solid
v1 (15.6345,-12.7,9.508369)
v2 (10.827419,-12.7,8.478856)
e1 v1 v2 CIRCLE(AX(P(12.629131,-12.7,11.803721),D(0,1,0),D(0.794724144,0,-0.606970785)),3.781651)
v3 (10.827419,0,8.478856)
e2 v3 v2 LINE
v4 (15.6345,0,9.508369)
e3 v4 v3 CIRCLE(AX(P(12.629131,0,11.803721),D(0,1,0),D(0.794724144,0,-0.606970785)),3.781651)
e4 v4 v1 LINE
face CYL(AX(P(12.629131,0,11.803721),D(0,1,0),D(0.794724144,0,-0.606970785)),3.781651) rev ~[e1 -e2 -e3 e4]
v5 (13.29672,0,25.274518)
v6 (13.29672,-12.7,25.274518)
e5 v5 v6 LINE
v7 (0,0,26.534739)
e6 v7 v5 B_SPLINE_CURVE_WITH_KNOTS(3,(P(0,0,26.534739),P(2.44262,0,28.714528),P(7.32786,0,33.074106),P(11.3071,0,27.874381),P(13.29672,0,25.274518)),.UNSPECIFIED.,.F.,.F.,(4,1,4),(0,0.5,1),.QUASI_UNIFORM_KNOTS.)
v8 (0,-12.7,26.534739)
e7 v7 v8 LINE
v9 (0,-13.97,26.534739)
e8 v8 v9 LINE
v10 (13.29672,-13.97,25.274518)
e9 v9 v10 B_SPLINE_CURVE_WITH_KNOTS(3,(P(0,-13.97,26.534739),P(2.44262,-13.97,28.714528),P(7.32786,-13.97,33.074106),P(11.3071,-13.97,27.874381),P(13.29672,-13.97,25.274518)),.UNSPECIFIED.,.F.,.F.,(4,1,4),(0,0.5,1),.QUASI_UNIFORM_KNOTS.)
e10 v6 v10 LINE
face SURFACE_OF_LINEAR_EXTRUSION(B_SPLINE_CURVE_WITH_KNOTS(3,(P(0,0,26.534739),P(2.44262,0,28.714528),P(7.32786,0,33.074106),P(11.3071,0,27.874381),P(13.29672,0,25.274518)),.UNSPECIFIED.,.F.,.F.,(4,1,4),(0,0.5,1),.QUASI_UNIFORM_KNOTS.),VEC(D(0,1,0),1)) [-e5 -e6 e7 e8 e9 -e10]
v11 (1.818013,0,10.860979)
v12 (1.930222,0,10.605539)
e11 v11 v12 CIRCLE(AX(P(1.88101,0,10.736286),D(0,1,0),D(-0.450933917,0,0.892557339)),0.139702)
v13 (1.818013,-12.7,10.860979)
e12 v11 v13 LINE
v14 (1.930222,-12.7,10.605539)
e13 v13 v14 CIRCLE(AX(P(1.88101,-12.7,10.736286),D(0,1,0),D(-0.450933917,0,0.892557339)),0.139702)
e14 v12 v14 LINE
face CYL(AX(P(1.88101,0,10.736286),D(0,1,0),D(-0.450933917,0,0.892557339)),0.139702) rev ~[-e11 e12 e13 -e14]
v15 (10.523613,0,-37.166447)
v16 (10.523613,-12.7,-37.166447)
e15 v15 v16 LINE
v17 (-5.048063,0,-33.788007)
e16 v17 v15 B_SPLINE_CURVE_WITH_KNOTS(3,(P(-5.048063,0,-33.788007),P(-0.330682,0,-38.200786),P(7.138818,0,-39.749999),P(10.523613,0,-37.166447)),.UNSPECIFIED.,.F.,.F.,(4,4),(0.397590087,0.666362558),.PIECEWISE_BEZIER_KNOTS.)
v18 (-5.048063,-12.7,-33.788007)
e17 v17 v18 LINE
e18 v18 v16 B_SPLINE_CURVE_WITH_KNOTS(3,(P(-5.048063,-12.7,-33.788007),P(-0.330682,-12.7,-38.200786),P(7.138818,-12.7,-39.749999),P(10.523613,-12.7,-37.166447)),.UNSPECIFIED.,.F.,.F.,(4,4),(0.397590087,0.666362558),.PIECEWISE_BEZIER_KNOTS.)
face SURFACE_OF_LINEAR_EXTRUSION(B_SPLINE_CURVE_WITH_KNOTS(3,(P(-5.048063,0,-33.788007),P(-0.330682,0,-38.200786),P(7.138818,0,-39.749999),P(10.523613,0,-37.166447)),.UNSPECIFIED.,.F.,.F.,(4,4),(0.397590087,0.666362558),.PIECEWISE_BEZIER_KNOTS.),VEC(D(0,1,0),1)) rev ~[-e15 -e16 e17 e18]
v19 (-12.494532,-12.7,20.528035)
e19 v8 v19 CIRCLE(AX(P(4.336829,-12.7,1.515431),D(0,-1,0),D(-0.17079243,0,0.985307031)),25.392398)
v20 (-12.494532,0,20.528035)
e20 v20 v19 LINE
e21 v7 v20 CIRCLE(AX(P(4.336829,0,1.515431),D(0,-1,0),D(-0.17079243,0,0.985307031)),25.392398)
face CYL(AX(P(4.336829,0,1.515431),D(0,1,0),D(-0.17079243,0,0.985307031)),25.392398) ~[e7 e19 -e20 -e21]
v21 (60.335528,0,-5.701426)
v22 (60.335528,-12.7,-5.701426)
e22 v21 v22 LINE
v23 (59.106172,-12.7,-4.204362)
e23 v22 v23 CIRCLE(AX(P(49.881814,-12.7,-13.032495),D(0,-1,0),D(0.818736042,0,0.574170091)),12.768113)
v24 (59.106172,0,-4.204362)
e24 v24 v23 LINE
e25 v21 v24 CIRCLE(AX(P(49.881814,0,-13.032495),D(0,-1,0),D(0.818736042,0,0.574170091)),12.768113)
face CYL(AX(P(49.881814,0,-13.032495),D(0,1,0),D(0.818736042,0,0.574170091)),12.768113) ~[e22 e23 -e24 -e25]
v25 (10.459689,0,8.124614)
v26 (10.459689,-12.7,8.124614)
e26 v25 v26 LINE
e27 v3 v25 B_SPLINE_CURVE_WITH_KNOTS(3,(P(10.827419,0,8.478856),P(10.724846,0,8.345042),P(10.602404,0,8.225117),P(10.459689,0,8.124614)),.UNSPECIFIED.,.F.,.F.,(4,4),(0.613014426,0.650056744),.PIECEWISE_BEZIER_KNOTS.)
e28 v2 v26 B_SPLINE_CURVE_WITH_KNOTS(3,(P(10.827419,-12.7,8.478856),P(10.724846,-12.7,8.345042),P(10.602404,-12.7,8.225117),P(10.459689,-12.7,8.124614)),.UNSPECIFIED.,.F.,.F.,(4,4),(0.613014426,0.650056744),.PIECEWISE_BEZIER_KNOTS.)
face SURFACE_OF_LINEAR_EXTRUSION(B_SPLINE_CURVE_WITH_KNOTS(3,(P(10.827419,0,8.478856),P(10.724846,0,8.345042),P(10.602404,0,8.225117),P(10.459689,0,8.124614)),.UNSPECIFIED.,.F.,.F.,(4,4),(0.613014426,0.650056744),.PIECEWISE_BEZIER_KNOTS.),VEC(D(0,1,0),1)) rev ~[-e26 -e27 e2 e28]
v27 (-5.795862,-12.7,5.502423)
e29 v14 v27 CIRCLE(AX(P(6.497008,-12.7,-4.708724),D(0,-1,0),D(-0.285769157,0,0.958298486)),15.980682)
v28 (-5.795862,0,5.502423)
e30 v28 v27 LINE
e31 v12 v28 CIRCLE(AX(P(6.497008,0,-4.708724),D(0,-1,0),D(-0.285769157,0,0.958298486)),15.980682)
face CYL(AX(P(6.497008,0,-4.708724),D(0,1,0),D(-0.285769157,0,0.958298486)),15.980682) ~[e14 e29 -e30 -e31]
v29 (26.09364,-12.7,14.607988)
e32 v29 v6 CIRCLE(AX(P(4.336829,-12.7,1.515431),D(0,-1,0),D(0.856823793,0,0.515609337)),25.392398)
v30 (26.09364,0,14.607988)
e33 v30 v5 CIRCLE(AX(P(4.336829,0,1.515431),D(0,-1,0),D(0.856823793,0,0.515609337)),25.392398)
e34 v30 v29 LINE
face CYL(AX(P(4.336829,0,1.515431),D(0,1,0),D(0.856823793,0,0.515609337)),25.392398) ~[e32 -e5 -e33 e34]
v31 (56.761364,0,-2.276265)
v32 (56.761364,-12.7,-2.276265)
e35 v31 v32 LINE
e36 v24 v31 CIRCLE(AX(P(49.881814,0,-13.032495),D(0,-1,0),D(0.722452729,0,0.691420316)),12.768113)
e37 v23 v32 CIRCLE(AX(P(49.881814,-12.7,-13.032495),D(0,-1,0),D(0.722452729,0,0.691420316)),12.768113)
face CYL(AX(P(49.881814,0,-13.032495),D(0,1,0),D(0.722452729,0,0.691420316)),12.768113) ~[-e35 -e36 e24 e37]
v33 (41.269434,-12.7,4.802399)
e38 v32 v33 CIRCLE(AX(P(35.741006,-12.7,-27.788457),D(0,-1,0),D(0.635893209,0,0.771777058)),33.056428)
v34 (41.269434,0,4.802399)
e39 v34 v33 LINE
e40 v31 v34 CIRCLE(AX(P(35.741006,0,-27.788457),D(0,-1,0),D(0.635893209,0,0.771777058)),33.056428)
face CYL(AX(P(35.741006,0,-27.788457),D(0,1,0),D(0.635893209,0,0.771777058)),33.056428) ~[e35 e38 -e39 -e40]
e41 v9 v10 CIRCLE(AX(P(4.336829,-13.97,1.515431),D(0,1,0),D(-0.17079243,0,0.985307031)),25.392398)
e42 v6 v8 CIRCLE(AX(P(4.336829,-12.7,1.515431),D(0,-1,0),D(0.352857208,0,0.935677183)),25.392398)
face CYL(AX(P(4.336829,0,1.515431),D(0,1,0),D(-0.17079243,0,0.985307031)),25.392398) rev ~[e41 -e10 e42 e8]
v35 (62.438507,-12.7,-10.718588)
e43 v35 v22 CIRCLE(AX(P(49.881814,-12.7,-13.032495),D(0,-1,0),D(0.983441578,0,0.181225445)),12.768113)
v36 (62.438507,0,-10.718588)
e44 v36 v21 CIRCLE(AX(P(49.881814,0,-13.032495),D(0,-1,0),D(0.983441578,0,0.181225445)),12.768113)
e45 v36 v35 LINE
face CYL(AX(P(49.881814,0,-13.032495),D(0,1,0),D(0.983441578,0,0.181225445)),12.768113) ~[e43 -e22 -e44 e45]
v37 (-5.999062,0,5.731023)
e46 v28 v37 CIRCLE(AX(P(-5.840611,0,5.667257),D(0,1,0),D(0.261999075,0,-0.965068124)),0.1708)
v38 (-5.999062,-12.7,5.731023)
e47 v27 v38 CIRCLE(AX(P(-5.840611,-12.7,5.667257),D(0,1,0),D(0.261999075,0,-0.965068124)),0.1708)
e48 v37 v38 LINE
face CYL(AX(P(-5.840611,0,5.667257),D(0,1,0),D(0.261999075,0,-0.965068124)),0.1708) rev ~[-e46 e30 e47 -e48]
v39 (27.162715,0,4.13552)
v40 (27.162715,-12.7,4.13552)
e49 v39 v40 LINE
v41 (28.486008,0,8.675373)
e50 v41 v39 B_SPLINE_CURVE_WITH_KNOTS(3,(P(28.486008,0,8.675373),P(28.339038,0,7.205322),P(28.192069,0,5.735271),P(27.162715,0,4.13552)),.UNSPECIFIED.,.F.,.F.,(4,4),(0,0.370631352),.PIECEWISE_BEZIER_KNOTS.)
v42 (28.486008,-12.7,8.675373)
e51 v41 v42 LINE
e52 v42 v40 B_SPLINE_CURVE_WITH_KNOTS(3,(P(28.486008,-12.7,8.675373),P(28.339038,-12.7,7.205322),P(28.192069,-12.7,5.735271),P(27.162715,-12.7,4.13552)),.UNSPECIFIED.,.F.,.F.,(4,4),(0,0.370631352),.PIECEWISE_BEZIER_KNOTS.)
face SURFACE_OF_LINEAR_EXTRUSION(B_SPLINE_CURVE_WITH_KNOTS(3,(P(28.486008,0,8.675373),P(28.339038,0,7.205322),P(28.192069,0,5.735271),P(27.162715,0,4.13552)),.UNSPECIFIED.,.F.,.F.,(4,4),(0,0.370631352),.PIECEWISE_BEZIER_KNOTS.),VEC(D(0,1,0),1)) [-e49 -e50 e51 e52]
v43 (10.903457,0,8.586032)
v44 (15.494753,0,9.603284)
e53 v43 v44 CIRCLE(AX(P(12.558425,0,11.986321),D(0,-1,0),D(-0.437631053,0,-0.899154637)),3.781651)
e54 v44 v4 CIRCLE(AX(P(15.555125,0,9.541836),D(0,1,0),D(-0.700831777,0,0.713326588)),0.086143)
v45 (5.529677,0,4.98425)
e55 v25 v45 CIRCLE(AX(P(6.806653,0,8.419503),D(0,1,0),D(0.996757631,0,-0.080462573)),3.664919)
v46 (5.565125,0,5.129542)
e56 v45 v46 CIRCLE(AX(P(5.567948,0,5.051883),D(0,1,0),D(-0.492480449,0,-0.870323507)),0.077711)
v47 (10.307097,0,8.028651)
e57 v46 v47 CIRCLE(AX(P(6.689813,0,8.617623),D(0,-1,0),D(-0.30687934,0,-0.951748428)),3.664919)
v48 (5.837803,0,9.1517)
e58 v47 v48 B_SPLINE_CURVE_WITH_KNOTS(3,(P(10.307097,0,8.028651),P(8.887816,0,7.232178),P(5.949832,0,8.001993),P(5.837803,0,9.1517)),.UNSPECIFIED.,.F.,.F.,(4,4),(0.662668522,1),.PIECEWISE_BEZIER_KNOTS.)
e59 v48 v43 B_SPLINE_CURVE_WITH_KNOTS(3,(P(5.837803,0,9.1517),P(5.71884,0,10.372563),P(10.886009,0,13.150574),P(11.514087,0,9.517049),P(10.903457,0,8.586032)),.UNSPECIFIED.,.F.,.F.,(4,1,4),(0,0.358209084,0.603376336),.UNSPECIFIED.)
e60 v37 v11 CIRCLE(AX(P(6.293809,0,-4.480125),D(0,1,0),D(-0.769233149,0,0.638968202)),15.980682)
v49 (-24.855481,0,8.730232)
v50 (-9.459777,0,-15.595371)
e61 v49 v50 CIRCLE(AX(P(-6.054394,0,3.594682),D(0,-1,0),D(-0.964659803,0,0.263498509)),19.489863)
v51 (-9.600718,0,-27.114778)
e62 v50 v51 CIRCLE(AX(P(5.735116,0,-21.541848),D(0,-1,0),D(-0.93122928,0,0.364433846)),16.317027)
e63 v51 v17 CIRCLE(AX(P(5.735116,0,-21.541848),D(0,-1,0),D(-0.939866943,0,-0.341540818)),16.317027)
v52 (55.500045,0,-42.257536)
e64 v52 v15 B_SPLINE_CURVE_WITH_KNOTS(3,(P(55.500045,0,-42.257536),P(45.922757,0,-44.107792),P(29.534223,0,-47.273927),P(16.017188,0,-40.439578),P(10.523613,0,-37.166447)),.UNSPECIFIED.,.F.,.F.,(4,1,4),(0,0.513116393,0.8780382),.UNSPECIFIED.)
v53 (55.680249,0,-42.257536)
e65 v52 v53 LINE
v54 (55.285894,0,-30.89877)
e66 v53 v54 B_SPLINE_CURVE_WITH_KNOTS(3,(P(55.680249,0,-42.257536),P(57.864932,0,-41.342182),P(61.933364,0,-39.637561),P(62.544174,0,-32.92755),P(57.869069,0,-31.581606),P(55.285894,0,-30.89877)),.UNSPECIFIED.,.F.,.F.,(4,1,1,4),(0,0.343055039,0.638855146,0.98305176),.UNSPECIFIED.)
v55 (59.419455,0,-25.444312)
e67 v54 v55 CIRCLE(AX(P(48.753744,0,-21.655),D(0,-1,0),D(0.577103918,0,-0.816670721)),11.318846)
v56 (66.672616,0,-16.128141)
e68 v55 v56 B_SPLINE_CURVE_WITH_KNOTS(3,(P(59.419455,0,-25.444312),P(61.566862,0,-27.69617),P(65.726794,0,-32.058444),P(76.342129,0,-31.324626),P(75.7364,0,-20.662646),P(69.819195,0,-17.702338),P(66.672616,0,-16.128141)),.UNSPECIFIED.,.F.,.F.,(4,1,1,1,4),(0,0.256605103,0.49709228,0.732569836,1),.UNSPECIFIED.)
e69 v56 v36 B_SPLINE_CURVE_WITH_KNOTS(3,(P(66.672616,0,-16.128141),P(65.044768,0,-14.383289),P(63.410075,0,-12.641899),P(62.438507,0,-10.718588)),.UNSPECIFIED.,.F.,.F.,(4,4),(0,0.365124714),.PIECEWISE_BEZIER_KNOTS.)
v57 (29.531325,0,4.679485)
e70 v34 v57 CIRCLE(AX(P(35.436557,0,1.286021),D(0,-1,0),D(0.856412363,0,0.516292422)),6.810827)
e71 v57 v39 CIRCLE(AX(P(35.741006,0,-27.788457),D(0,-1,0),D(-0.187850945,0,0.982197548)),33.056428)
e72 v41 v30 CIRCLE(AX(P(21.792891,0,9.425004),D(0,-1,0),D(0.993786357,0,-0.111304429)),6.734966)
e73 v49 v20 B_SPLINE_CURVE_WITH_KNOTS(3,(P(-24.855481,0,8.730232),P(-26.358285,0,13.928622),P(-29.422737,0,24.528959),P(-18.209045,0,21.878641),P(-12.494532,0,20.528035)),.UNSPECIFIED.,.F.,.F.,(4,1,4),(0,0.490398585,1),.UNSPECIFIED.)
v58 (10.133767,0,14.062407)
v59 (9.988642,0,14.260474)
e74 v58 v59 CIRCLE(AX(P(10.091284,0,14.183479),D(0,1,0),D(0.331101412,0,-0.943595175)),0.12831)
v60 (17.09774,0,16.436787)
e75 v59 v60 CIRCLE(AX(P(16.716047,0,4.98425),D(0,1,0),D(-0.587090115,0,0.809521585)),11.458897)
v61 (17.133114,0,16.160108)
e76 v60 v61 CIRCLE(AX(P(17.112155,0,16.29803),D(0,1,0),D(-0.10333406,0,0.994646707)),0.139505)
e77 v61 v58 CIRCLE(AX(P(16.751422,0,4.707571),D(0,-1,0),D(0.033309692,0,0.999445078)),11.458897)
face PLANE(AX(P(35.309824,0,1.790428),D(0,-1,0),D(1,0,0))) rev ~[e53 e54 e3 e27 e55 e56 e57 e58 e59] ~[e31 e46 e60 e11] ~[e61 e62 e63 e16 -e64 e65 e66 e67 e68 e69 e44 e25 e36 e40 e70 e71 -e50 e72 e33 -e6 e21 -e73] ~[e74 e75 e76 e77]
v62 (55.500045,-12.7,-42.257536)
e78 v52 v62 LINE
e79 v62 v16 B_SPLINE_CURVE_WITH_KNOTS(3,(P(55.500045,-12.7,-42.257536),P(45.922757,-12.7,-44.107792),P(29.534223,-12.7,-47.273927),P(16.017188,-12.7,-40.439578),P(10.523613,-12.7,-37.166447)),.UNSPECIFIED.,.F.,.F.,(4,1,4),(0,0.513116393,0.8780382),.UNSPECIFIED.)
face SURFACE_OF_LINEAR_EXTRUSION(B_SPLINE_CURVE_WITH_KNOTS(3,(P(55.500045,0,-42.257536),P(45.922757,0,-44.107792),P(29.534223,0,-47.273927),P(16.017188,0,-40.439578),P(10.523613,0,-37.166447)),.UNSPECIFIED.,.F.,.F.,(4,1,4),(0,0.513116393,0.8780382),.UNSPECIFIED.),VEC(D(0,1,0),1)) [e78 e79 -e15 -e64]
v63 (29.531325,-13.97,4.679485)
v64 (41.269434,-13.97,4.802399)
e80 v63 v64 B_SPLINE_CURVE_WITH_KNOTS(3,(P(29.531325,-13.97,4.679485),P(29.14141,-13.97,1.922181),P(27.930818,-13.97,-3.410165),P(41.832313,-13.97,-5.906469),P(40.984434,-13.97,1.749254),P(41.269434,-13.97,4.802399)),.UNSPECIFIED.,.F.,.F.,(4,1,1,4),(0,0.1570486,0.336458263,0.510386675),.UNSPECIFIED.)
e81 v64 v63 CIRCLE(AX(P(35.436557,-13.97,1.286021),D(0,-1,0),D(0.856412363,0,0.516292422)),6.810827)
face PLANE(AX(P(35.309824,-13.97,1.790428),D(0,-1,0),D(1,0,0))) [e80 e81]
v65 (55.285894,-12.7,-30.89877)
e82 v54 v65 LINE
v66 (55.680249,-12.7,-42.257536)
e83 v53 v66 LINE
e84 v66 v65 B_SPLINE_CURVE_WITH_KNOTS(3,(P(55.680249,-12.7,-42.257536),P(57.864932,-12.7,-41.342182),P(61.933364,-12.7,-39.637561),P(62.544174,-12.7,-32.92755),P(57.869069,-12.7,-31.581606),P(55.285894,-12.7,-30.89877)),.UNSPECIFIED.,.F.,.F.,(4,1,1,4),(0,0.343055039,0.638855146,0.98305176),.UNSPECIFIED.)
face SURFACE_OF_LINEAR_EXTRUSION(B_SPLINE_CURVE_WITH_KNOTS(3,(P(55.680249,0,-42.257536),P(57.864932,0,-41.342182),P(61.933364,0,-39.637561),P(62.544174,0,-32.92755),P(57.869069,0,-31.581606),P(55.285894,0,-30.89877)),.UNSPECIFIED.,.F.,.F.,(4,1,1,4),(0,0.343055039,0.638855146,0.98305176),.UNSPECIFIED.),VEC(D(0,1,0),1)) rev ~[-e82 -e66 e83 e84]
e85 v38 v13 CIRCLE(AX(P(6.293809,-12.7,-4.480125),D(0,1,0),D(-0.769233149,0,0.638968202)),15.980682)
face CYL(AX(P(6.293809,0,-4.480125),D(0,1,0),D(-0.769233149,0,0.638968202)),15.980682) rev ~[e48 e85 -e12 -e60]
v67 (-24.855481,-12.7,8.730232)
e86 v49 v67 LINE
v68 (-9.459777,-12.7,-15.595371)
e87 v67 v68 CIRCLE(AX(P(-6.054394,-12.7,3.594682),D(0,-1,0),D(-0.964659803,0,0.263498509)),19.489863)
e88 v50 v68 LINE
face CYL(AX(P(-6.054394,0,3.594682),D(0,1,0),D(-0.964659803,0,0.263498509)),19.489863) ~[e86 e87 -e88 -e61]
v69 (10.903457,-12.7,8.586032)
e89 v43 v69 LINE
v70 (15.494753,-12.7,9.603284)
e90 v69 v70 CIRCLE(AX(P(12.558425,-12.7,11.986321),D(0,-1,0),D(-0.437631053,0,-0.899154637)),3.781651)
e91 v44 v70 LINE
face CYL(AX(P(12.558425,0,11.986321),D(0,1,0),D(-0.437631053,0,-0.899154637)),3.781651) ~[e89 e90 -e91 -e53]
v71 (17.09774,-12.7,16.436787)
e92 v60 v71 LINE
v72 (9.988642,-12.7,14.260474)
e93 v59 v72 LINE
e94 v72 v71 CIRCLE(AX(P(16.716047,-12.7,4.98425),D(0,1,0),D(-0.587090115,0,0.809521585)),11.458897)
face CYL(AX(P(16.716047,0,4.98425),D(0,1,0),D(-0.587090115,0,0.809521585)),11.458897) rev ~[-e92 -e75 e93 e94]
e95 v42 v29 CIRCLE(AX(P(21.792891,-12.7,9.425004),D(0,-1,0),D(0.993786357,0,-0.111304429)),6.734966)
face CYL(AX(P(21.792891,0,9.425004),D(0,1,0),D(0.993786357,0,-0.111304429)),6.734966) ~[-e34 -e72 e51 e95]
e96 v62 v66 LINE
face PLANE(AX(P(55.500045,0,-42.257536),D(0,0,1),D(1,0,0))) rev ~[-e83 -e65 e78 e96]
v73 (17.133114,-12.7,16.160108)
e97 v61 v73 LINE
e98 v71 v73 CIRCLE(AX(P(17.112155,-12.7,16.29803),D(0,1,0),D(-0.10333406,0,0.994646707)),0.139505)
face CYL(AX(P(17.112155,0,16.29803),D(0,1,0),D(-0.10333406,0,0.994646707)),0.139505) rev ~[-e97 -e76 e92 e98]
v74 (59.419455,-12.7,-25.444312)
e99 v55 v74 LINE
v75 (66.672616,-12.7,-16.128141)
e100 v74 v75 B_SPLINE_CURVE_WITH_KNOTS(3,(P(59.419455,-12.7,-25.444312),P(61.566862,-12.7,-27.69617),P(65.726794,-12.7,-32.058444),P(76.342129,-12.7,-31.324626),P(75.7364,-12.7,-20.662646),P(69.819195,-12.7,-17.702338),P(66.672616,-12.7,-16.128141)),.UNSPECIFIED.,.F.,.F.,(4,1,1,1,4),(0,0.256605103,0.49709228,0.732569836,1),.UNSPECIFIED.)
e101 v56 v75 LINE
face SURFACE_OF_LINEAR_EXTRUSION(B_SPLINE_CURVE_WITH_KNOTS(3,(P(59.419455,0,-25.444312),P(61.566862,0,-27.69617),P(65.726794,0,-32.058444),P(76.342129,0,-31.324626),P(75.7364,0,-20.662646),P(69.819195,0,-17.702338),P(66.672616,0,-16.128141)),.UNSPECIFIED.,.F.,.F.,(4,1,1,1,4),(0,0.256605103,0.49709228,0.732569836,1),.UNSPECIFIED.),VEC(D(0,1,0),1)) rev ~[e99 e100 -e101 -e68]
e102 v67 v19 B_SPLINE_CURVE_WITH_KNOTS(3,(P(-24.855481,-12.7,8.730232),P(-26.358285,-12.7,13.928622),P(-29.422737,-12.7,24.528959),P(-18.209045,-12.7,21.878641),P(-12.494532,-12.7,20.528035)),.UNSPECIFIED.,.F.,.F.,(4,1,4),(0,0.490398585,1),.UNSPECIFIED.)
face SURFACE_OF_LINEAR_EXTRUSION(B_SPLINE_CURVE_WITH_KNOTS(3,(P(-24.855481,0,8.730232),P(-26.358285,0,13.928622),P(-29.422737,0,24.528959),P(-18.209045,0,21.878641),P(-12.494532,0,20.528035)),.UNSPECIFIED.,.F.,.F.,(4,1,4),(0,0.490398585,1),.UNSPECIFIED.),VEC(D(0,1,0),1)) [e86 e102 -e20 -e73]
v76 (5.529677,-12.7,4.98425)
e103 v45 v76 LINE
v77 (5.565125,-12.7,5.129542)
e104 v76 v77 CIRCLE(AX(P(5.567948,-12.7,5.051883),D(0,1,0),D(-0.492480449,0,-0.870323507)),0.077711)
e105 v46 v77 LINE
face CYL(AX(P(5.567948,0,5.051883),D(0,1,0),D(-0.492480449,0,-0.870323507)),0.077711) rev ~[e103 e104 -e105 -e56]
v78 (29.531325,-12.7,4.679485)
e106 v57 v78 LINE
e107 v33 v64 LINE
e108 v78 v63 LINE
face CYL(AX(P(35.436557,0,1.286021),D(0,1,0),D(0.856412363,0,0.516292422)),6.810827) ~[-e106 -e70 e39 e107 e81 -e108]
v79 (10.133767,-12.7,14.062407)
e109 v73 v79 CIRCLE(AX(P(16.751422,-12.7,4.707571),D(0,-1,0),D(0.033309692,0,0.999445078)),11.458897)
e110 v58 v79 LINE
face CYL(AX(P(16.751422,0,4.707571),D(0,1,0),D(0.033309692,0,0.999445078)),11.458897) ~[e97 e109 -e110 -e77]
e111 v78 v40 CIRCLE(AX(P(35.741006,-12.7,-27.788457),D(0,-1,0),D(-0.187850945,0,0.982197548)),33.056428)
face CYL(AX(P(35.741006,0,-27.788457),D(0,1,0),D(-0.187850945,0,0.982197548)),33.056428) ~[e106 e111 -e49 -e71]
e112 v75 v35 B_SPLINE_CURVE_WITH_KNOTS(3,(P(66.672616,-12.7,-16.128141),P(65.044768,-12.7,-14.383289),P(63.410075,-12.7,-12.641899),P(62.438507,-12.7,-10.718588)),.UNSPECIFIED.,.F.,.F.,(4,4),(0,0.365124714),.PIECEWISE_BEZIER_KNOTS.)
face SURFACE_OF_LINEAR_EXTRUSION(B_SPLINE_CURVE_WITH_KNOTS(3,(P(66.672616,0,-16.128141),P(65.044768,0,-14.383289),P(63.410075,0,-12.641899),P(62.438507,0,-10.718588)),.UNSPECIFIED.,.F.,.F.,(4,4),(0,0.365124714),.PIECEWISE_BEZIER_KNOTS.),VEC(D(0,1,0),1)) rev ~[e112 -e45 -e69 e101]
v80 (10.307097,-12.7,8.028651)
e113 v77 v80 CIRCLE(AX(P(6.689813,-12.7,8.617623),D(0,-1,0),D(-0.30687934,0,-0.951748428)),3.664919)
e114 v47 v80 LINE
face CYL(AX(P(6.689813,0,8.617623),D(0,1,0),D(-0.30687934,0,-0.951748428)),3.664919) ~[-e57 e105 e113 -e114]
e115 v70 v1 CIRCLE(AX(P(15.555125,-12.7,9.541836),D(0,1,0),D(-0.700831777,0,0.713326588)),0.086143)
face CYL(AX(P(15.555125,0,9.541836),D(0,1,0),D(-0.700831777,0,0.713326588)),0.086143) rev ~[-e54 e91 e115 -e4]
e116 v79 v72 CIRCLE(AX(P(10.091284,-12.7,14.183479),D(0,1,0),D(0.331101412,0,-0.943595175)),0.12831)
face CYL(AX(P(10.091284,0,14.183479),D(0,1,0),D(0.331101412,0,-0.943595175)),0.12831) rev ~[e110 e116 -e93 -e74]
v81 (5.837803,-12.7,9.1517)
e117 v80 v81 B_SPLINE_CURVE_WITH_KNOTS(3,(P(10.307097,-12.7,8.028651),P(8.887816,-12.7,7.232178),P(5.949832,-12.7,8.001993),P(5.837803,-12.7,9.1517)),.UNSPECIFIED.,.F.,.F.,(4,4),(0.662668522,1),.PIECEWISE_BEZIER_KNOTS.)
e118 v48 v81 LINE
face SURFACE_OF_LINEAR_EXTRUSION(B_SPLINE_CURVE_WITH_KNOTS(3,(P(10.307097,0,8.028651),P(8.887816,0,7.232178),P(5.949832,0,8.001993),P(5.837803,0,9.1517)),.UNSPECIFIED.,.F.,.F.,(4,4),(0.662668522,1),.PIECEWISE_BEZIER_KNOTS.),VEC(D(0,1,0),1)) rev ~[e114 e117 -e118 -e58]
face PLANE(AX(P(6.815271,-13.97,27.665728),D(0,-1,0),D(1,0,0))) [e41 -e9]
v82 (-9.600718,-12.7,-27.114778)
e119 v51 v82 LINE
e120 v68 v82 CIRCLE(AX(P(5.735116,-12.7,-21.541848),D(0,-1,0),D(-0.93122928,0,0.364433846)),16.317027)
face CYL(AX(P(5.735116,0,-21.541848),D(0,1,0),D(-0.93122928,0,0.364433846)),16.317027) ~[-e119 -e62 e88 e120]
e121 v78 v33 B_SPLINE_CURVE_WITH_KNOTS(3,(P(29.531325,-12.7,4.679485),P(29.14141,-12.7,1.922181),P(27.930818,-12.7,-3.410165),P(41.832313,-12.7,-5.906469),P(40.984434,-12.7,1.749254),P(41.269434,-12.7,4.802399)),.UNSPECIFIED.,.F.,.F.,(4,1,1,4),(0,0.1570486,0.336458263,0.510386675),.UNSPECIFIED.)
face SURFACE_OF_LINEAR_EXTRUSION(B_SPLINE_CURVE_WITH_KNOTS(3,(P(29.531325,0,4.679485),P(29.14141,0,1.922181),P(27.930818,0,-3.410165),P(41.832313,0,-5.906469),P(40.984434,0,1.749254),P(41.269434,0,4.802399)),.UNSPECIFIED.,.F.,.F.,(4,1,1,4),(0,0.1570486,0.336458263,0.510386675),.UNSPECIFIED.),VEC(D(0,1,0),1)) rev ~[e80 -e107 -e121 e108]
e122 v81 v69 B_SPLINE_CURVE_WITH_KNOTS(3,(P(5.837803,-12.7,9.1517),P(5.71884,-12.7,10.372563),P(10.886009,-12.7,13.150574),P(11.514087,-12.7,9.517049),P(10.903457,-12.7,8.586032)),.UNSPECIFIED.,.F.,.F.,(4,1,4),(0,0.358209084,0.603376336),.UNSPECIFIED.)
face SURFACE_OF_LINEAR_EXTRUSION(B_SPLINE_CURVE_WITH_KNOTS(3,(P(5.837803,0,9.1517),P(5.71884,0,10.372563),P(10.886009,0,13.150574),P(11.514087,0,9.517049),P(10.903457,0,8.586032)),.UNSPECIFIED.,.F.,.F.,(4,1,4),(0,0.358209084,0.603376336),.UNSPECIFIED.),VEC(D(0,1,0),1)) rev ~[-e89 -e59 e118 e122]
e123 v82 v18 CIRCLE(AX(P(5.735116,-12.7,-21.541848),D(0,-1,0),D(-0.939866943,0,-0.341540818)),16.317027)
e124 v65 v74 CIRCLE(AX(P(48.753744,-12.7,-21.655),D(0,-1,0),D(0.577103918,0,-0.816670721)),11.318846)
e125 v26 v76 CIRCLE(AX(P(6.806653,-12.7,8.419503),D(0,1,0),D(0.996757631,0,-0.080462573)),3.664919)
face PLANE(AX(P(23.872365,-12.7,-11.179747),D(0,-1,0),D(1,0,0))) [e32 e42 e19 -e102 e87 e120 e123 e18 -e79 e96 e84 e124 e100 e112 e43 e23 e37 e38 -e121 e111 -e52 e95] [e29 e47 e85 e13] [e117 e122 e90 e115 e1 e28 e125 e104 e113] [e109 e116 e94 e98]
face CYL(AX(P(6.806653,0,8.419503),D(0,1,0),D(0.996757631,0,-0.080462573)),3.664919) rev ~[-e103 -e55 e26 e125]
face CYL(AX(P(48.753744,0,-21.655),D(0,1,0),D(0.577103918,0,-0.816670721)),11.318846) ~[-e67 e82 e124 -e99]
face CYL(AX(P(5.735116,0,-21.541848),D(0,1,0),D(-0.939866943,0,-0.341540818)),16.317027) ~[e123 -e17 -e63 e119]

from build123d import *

# Parameters (mm, degrees)
F1_DEPTH = 12.7
F2_DEPTH = 13.97


with BuildPart() as f1:
    # F0 (on Front) → F1 (new body)
    with BuildSketch(Plane.XZ):
        with BuildLine():
            add(Edge.make_bspline(
                [(59.1061716019, -4.2043621835), (58.3953510036, -3.510707878), (57.5753379472, -2.8959754481), (56.7613643321, -2.276264629)],
                knots=[0.8131179307, 0.8131179307, 0.8131179307, 0.8131179307, 1, 1, 1, 1], degree=3))
            ThreePointArc((56.7613643321, -2.276264629), (49.4791419592, 2.277986697), (41.2694336671, 4.8023990217))
            add(Edge.make_bspline(
                [(29.5313251719, 4.6794850926), (29.1414100604, 1.9221812865), (27.9308180864, -3.4101647296), (41.8323133175, -5.906469104), (40.9844336777, 1.749254351), (41.2694336671, 4.8023990217)],
                knots=[0, 0, 0, 0, 0.1570486005, 0.3364582627, 0.510386675, 0.510386675, 0.510386675, 0.510386675], degree=3))
            ThreePointArc((29.5313251719, 4.6794850926), (28.3420191938, 4.4292771407), (27.1627145152, 4.1355200917))
            add(Edge.make_bspline(
                [(28.4860077977, 8.6753729454), (28.3390382985, 7.2053221936), (28.1920687992, 5.7352714419), (27.1627145152, 4.1355200917)],
                knots=[0, 0, 0, 0, 0.3706313521, 0.3706313521, 0.3706313521, 0.3706313521], degree=3))
            ThreePointArc((28.4860077977, 8.6753729454), (28.0391099274, 11.9438353715), (26.0936398085, 14.6079882112))
            ThreePointArc((26.0936398085, 14.6079882112), (20.5948318097, 21.0205895609), (13.2967198545, 25.2745180236))
            ThreePointArc((13.2967198545, 25.2745180236), (6.7327034589, 26.7945457305), (0, 26.5347388693))
            ThreePointArc((0, 26.5347388693), (-6.6651341425, 24.4005933469), (-12.4945323914, 20.5280352384))
            add(Edge.make_bspline(
                [(-24.8554814607, 8.7302317843), (-26.3582845919, 13.9286221672), (-29.4227370154, 24.5289594145), (-18.2090454728, 21.878641168), (-12.4945323914, 20.5280352384)],
                knots=[0, 0, 0, 0, 0.4903985847, 1, 1, 1, 1], degree=3))
            ThreePointArc((-24.8554814607, 8.7302317843), (-22.5230177273, -6.8283307763), (-9.4597768039, -15.5953709036))
            ThreePointArc((-9.4597768039, -15.5953709036), (-10.5806893026, -21.3422223383), (-9.6007177755, -27.1147782755))
            add(Edge.make_bspline(
                [(-9.6007177755, -27.1147782755), (-8.5647365316, -29.5135595921), (-7.0556106981, -31.9100860204), (-5.0480626523, -33.7880067527)],
                knots=[0.2832101572, 0.2832101572, 0.2832101572, 0.2832101572, 0.3975900868, 0.3975900868, 0.3975900868, 0.3975900868], degree=3))
            add(Edge.make_bspline(
                [(-5.0480626523, -33.7880067527), (-0.3306821613, -38.2007861357), (7.1388179474, -39.7499994998), (10.5236132672, -37.1664466075)],
                knots=[0.3975900868, 0.3975900868, 0.3975900868, 0.3975900868, 0.6663625578, 0.6663625578, 0.6663625578, 0.6663625578], degree=3))
            add(Edge.make_bspline(
                [(55.5000454187, -42.2575362027), (45.9227569206, -44.1077921969), (29.534223499, -47.2739265579), (16.0171883325, -40.4395783324), (10.5236132672, -37.1664466075)],
                knots=[0, 0, 0, 0, 0.5131163927, 0.8780381998, 0.8780381998, 0.8780381998, 0.8780381998], degree=3))
            Line((55.5000454187, -42.2575362027), (55.6802488863, -42.2575362027))
            add(Edge.make_bspline(
                [(55.6802488863, -42.2575362027), (57.8649319172, -41.3421819694), (61.933363626, -39.6375611457), (62.5441736967, -32.9275500123), (57.8690689466, -31.5816055418), (55.2858944788, -30.8987696483)],
                knots=[0, 0, 0, 0, 0.3430550385, 0.6388551459, 0.9830517596, 0.9830517596, 0.9830517596, 0.9830517596], degree=3))
            ThreePointArc((55.2858944788, -30.8987696483), (57.774796408, -28.4914379114), (59.4194548829, -25.4443118219))
            add(Edge.make_bspline(
                [(59.4194548829, -25.4443118219), (61.5668623777, -27.6961704589), (65.7267940312, -32.0584435934), (76.3421290349, -31.3246256264), (75.736400422, -20.6626458704), (69.8191952556, -17.7023380158), (66.6726157069, -16.128141433)],
                knots=[0, 0, 0, 0, 0.2566051025, 0.4970922803, 0.7325698364, 1, 1, 1, 1], degree=3))
            add(Edge.make_bspline(
                [(66.6726157069, -16.128141433), (65.0447675311, -14.3832892567), (63.4100748942, -12.6418994745), (62.438506633, -10.718587786)],
                knots=[0, 0, 0, 0, 0.3651247136, 0.3651247136, 0.3651247136, 0.3651247136], degree=3))
            add(Edge.make_bspline(
                [(62.438506633, -10.718587786), (61.5739147936, -9.0070460887), (61.2344575356, -7.1514386813), (60.3355277859, -5.7014262697)],
                knots=[0.3651247136, 0.3651247136, 0.3651247136, 0.3651247136, 0.6900466571, 0.6900466571, 0.6900466571, 0.6900466571], degree=3))
            ThreePointArc((60.3355277859, -5.7014262697), (59.7492819423, -4.929546288), (59.1061716019, -4.2043621835))
        make_face()
        with BuildLine():
            ThreePointArc((-5.9990617447, 5.7310229167), (-2.4740959169, 8.8804908185), (1.8180131447, 10.8609786257))
            ThreePointArc((1.8180131447, 10.8609786257), (2.0089152962, 10.7924724578), (1.9302222129, 10.60553898))
            ThreePointArc((1.9302222129, 10.60553898), (-2.3105141336, 8.6258077241), (-5.79586206, 5.5024232715))
            ThreePointArc((-5.79586206, 5.5024232715), (-5.9682689093, 5.5537835324), (-5.9990617447, 5.7310229167))
        make_face(mode=Mode.SUBTRACT)
        with BuildLine():
            add(Edge.make_bspline(
                [(10.3070973536, 8.028651153), (8.8878162788, 7.2321778462), (5.9498321238, 8.001992808), (5.8378027752, 9.1516999528)],
                knots=[0.6626685216, 0.6626685216, 0.6626685216, 0.6626685216, 1, 1, 1, 1], degree=3))
            add(Edge.make_bspline(
                [(5.8378027752, 9.1516999528), (5.7188398768, 10.3725630212), (10.8860088037, 13.1505736904), (11.5140866455, 9.5170493858), (10.9034565546, 8.586031805)],
                knots=[0, 0, 0, 0, 0.3582090845, 0.6033763358, 0.6033763358, 0.6033763358, 0.6033763358], degree=3))
            ThreePointArc((10.9034565546, 8.586031805), (13.3764537584, 8.2942058615), (15.4947527988, 9.6032844405))
            ThreePointArc((15.4947527988, 9.6032844405), (15.6035241906, 9.6130970285), (15.6345004432, 9.5083689314))
            ThreePointArc((15.6345004432, 9.5083689314), (13.4210728493, 8.1059221778), (10.8274193225, 8.4788564786))
            add(Edge.make_bspline(
                [(10.8274193225, 8.4788564786), (10.7248464569, 8.3450423002), (10.6024036816, 8.2251174819), (10.4596894234, 8.1246141344)],
                knots=[0.6130144256, 0.6130144256, 0.6130144256, 0.6130144256, 0.6500567437, 0.6500567437, 0.6500567437, 0.6500567437], degree=3))
            ThreePointArc((10.4596894234, 8.1246141344), (8.7756345565, 5.3284277831), (5.5296770297, 4.9842495724))
            ThreePointArc((5.5296770297, 4.9842495724), (5.4924518419, 5.0703022397), (5.5651250629, 5.1295422522))
            ThreePointArc((5.5651250629, 5.1295422522), (8.601479146, 5.4907773493), (10.3070973536, 8.028651153))
        make_face(mode=Mode.SUBTRACT)
        with BuildLine():
            ThreePointArc((9.9886422977, 14.2604736611), (13.3617809031, 15.9412203037), (17.0977395028, 16.4367873222))
            ThreePointArc((17.0977395028, 16.4367873222), (17.2505331806, 16.3157218017), (17.1331140203, 16.16010847))
            ThreePointArc((17.1331140203, 16.16010847), (13.4617569094, 15.6841100404), (10.1337671161, 14.0624067764))
            ThreePointArc((10.1337671161, 14.0624067764), (9.9877830492, 14.1076437209), (9.9886422977, 14.2604736611))
        make_face(mode=Mode.SUBTRACT)
        with BuildLine():
            ThreePointArc((59.1061716019, -4.2043621835), (57.9912746912, -3.1703780522), (56.7613643321, -2.276264629))
            add(Edge.make_bspline(
                [(59.1061716019, -4.2043621835), (58.3953510036, -3.510707878), (57.5753379472, -2.8959754481), (56.7613643321, -2.276264629)],
                knots=[0.8131179307, 0.8131179307, 0.8131179307, 0.8131179307, 1, 1, 1, 1], degree=3))
        make_face()
        with BuildLine():
            ThreePointArc((62.438506633, -10.718587786), (61.657325801, -8.0967052638), (60.3355277859, -5.7014262697))
            add(Edge.make_bspline(
                [(62.438506633, -10.718587786), (61.5739147936, -9.0070460887), (61.2344575356, -7.1514386813), (60.3355277859, -5.7014262697)],
                knots=[0.3651247136, 0.3651247136, 0.3651247136, 0.3651247136, 0.6900466571, 0.6900466571, 0.6900466571, 0.6900466571], degree=3))
        make_face()
        with BuildLine():
            ThreePointArc((-9.6007177755, -27.1147782755), (-7.7438934974, -30.7375888851), (-5.0480626523, -33.7880067527))
            add(Edge.make_bspline(
                [(-9.6007177755, -27.1147782755), (-8.5647365316, -29.5135595921), (-7.0556106981, -31.9100860204), (-5.0480626523, -33.7880067527)],
                knots=[0.2832101572, 0.2832101572, 0.2832101572, 0.2832101572, 0.3975900868, 0.3975900868, 0.3975900868, 0.3975900868], degree=3))
        make_face()
    extrude(amount=F1_DEPTH)

    # F0 (on Front) → F2 (join)
    with BuildSketch(Plane.XZ):
        with BuildLine():
            add(Edge.make_bspline(
                [(29.5313251719, 4.6794850926), (29.1414100604, 1.9221812865), (27.9308180864, -3.4101647296), (41.8323133175, -5.906469104), (40.9844336777, 1.749254351), (41.2694336671, 4.8023990217)],
                knots=[0, 0, 0, 0, 0.1570486005, 0.3364582627, 0.510386675, 0.510386675, 0.510386675, 0.510386675], degree=3))
            ThreePointArc((41.2694336671, 4.8023990217), (35.3652424418, 8.0964743323), (29.5313251719, 4.6794850926))
        make_face()
        with BuildLine():
            ThreePointArc((0, 26.5347388693), (6.7327034589, 26.7945457305), (13.2967198545, 25.2745180236))
            add(Edge.make_bspline(
                [(0, 26.5347388693), (2.4426200797, 28.7145279713), (7.327860239, 33.0741061753), (11.3070999826, 27.8743807408), (13.2967198545, 25.2745180236)],
                knots=[0, 0, 0, 0, 0.5, 1, 1, 1, 1], degree=3))
        make_face()
    extrude(amount=F2_DEPTH)


solid = f1.part
